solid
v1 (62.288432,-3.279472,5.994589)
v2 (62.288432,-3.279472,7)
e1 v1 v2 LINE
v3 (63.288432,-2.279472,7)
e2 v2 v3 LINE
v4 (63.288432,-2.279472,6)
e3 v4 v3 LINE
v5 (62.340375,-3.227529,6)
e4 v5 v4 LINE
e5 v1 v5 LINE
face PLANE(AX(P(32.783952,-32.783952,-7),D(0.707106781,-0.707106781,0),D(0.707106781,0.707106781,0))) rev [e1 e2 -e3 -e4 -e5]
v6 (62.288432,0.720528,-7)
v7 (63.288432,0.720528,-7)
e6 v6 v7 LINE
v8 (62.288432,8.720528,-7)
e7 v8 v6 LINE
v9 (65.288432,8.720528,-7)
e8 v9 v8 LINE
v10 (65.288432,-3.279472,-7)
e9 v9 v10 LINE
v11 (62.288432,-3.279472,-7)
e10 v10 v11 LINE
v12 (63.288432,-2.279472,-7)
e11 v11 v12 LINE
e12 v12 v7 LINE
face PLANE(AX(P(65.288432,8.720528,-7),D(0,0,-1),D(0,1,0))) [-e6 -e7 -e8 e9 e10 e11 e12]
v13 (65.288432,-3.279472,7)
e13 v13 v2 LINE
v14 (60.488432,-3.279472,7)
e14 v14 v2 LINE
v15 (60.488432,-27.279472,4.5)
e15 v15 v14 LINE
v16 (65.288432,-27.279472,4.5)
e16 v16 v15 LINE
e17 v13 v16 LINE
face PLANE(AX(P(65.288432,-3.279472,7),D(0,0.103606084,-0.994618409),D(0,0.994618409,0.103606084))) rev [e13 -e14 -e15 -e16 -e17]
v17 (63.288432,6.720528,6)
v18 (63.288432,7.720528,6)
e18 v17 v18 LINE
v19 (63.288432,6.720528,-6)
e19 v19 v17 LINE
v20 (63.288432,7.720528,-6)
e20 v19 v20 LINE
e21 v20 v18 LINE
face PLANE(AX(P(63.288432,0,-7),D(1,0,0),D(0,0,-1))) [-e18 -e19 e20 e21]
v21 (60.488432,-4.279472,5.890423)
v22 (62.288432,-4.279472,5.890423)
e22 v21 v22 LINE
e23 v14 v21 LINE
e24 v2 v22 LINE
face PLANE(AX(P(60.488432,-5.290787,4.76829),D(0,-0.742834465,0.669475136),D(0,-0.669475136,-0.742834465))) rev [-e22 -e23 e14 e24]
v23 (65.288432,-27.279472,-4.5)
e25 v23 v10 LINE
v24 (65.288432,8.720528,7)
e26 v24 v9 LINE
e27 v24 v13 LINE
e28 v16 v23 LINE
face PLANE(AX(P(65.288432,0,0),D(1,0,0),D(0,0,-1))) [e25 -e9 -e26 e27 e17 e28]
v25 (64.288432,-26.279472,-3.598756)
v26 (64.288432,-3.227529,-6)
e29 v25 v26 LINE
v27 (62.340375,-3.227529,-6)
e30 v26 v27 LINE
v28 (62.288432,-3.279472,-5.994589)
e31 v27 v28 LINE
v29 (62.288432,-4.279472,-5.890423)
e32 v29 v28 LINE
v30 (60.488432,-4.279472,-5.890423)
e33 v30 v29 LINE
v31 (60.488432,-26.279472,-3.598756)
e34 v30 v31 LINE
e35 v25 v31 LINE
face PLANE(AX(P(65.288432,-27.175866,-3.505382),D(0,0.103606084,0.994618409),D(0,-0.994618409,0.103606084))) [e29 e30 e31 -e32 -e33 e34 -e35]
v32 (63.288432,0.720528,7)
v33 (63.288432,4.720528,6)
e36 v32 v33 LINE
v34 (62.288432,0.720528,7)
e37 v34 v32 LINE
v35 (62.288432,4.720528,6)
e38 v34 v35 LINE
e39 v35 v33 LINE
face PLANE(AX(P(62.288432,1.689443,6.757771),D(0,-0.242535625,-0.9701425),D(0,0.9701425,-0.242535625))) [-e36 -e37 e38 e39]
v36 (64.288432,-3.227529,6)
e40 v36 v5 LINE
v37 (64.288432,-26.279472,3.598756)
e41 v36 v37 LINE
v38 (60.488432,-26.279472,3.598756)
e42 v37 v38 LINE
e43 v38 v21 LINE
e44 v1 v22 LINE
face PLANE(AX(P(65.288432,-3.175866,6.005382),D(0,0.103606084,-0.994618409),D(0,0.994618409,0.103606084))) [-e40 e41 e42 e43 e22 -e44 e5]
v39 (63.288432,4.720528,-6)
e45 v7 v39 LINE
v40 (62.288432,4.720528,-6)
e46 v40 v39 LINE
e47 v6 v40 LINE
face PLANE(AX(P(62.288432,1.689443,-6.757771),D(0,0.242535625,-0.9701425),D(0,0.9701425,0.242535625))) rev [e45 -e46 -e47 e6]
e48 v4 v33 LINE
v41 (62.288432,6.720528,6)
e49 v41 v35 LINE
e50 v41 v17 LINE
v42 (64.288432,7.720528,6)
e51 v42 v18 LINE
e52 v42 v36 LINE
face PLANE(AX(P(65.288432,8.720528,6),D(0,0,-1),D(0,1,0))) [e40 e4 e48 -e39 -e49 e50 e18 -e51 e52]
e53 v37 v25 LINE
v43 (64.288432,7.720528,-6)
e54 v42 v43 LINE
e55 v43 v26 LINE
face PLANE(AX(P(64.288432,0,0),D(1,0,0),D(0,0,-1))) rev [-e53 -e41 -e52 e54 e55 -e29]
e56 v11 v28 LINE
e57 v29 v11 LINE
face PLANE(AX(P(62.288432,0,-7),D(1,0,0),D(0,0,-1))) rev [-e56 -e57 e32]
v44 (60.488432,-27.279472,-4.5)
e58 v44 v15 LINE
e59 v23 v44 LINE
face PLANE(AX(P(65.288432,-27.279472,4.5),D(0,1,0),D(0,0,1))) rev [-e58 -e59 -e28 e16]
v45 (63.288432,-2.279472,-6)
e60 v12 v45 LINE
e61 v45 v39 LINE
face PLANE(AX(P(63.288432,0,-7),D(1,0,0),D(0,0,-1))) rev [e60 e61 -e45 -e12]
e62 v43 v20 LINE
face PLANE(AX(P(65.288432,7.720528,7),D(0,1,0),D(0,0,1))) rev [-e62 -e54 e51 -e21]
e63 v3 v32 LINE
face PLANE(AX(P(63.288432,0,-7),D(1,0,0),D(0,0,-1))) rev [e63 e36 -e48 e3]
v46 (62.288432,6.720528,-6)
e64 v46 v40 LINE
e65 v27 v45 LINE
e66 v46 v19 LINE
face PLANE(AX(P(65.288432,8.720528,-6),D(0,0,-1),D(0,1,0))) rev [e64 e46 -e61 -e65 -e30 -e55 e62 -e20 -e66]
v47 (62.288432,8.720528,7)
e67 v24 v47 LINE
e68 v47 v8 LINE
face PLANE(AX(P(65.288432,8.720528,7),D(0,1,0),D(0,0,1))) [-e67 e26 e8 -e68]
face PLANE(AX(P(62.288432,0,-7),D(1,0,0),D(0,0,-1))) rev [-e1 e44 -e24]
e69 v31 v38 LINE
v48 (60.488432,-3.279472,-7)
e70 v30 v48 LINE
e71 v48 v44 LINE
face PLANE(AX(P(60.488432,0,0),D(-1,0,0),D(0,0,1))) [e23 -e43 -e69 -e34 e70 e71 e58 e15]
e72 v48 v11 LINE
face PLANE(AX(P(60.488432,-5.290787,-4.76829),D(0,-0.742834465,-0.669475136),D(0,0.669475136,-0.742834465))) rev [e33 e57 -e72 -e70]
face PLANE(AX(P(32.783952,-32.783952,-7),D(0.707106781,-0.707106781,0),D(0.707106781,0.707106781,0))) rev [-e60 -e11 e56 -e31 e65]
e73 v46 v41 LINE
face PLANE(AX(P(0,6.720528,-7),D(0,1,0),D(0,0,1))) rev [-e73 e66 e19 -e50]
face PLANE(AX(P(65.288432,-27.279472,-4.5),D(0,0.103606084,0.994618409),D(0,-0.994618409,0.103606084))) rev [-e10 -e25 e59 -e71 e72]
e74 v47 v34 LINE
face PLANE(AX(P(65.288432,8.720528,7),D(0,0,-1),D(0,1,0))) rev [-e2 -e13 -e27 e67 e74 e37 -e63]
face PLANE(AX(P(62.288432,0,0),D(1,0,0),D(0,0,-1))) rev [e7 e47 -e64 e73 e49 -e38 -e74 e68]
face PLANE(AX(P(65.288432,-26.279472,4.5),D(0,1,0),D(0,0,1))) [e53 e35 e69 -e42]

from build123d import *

# Parameters (mm, degrees)
EXTRUDE_1_DEPTH          = 2.5
EXTRUDE_1_DEPTH_BACK     = 2.5
SKETCH_1_R               = 2
EXTRUDE_2_DEPTH          = 3
SKETCH_4_W               = 5
SKETCH_4_H               = 21
EXTRUDE_3_DEPTH          = 1.8
CUT_EXTRUDE_1_DEPTH      = 72.103790411
CUT_EXTRUDE_1_DEPTH_BACK = 72.103790411
SHELL_START              = 62.288432405
SHELL_1_DEPTH            = 2
SHELL_START_2            = 63.288432405
SHELL_1_2_OUTLINE_W      = 1
SHELL_1_2_OUTLINE_H      = 12
SHELL_1_2_DEPTH          = 1
EXTRUDE_4_DEPTH          = 1
EXTRUDE_5_DEPTH          = 1.8


with BuildPart() as part:
    # 草图1 → 凸台-拉伸1 (new, two sides: drawn at the far end of the back side and taken through both)
    # profile 1 of 2: a face of its own
    with BuildSketch(Plane.XY.offset(-EXTRUDE_1_DEPTH_BACK)):
        with Locations((54.288432405, 0.720527774)):
            Circle(SKETCH_1_R)
    # profile 2 of 2: a face of its own
    with BuildSketch(Plane.XY.offset(-EXTRUDE_1_DEPTH_BACK)):
        Polygon((54.288432405, 0.720527774), (62.288432405, 0.720527774), (62.288432405, -13.279472226), (62.288432405, -21.279472226), (54.288432405, -13.279472226), align=None)
        Polygon((56.288432405, -12.451045101), (60.288432405, -16.451045101), (60.288432405, -13.279472226), (60.288432405, -1.279472226), (56.288432405, -5.279472226), align=None, mode=Mode.SUBTRACT)
    extrude(amount=EXTRUDE_1_DEPTH + EXTRUDE_1_DEPTH_BACK)

    # 草图2 → 凸台-拉伸2 (add)
    with BuildSketch(Plane(origin=(62.288432405, 0, 0), x_dir=(0, 0, -1), z_dir=(1, 0, 0))):
        Polygon((-7, -3.279472226), (-4.5, -27.279472226), (4.5, -27.279472226), (7, -3.279472226), (7, 8.720527774), (-7, 8.720527774), align=None)
    extrude(amount=EXTRUDE_2_DEPTH)

    # 草图4 → 凸台-拉伸3 (add)
    with BuildSketch(Plane.ZY.offset(-62.288432405)):
        Polygon((-2.5, -0.279472226), (-7, -0.279472226), (-7, -3.279472226), (-4.5, -27.279472226), (4.5, -27.279472226), (7, -3.279472226), (7, -0.279472226), (2.5, -0.279472226), (2.5, -21.279472226), (-2.5, -21.279472226), align=None)
        with Locations((0, -10.779472226)):
            Rectangle(SKETCH_4_W, SKETCH_4_H)
    extrude(amount=EXTRUDE_3_DEPTH)

    # 草图5 → 切除-拉伸1 (cut, two sides: drawn at the far end of the back side and taken through both)
    with BuildSketch(Plane.XY.offset(-CUT_EXTRUDE_1_DEPTH_BACK)):
        Polygon((47.883968073, 6.720527774), (47.883968073, -27.279472226), (62.288432405, -27.279472226), (62.288432405, -3.279472226), (63.288432405, -2.279472226), (63.288432405, 6.720527774), (62.288432405, 6.720527774), align=None)
    extrude(amount=CUT_EXTRUDE_1_DEPTH + CUT_EXTRUDE_1_DEPTH_BACK, mode=Mode.SUBTRACT)

    # 抽壳1: read off the stored shape, not the designer's step
    # 抽壳1 outline → 抽壳1 (cut)
    with BuildSketch(Plane.YZ.offset(SHELL_START)):
        Polygon((6.720527774, -6), (6.720527774, 6), (-3.227529416, 6), (-26.279472226, 3.598755957), (-26.279472226, -3.598755957), (-3.227529416, -6), align=None)
    extrude(amount=SHELL_1_DEPTH, mode=Mode.SUBTRACT)

    # Shell 1 2 outline → Shell 1 2 (cut)
    with BuildSketch(Plane.YZ.offset(SHELL_START_2)):
        with Locations((7.220527774, 0)):
            Rectangle(SHELL_1_2_OUTLINE_W, SHELL_1_2_OUTLINE_H)
    extrude(amount=SHELL_1_2_DEPTH, mode=Mode.SUBTRACT)

    # 草图7 → 凸台-拉伸4 (add)
    with BuildSketch(Plane.ZY.offset(-63.288432405)):
        Polygon((-6, 4.720527774), (-6, 6.720527774), (-7, 6.720527774), (-7, 0.720527774), align=None)
        Polygon((6, 4.720527774), (7, 0.720527774), (7, 6.720527774), (6, 6.720527774), align=None)
    extrude(amount=EXTRUDE_4_DEPTH)

    # 草图6 → 凸台-拉伸5 (add)
    with BuildSketch(Plane.ZY.offset(-62.288432405)):
        Polygon((3.598755957, -26.279472226), (5.890422624, -4.279472226), (7, -3.279472226), (4.5, -27.279472226), (-4.5, -27.279472226), (-7, -3.279472226), (-5.890422624, -4.279472226), (-3.598755957, -26.279472226), align=None)
    extrude(amount=EXTRUDE_5_DEPTH)


solid = part.part
